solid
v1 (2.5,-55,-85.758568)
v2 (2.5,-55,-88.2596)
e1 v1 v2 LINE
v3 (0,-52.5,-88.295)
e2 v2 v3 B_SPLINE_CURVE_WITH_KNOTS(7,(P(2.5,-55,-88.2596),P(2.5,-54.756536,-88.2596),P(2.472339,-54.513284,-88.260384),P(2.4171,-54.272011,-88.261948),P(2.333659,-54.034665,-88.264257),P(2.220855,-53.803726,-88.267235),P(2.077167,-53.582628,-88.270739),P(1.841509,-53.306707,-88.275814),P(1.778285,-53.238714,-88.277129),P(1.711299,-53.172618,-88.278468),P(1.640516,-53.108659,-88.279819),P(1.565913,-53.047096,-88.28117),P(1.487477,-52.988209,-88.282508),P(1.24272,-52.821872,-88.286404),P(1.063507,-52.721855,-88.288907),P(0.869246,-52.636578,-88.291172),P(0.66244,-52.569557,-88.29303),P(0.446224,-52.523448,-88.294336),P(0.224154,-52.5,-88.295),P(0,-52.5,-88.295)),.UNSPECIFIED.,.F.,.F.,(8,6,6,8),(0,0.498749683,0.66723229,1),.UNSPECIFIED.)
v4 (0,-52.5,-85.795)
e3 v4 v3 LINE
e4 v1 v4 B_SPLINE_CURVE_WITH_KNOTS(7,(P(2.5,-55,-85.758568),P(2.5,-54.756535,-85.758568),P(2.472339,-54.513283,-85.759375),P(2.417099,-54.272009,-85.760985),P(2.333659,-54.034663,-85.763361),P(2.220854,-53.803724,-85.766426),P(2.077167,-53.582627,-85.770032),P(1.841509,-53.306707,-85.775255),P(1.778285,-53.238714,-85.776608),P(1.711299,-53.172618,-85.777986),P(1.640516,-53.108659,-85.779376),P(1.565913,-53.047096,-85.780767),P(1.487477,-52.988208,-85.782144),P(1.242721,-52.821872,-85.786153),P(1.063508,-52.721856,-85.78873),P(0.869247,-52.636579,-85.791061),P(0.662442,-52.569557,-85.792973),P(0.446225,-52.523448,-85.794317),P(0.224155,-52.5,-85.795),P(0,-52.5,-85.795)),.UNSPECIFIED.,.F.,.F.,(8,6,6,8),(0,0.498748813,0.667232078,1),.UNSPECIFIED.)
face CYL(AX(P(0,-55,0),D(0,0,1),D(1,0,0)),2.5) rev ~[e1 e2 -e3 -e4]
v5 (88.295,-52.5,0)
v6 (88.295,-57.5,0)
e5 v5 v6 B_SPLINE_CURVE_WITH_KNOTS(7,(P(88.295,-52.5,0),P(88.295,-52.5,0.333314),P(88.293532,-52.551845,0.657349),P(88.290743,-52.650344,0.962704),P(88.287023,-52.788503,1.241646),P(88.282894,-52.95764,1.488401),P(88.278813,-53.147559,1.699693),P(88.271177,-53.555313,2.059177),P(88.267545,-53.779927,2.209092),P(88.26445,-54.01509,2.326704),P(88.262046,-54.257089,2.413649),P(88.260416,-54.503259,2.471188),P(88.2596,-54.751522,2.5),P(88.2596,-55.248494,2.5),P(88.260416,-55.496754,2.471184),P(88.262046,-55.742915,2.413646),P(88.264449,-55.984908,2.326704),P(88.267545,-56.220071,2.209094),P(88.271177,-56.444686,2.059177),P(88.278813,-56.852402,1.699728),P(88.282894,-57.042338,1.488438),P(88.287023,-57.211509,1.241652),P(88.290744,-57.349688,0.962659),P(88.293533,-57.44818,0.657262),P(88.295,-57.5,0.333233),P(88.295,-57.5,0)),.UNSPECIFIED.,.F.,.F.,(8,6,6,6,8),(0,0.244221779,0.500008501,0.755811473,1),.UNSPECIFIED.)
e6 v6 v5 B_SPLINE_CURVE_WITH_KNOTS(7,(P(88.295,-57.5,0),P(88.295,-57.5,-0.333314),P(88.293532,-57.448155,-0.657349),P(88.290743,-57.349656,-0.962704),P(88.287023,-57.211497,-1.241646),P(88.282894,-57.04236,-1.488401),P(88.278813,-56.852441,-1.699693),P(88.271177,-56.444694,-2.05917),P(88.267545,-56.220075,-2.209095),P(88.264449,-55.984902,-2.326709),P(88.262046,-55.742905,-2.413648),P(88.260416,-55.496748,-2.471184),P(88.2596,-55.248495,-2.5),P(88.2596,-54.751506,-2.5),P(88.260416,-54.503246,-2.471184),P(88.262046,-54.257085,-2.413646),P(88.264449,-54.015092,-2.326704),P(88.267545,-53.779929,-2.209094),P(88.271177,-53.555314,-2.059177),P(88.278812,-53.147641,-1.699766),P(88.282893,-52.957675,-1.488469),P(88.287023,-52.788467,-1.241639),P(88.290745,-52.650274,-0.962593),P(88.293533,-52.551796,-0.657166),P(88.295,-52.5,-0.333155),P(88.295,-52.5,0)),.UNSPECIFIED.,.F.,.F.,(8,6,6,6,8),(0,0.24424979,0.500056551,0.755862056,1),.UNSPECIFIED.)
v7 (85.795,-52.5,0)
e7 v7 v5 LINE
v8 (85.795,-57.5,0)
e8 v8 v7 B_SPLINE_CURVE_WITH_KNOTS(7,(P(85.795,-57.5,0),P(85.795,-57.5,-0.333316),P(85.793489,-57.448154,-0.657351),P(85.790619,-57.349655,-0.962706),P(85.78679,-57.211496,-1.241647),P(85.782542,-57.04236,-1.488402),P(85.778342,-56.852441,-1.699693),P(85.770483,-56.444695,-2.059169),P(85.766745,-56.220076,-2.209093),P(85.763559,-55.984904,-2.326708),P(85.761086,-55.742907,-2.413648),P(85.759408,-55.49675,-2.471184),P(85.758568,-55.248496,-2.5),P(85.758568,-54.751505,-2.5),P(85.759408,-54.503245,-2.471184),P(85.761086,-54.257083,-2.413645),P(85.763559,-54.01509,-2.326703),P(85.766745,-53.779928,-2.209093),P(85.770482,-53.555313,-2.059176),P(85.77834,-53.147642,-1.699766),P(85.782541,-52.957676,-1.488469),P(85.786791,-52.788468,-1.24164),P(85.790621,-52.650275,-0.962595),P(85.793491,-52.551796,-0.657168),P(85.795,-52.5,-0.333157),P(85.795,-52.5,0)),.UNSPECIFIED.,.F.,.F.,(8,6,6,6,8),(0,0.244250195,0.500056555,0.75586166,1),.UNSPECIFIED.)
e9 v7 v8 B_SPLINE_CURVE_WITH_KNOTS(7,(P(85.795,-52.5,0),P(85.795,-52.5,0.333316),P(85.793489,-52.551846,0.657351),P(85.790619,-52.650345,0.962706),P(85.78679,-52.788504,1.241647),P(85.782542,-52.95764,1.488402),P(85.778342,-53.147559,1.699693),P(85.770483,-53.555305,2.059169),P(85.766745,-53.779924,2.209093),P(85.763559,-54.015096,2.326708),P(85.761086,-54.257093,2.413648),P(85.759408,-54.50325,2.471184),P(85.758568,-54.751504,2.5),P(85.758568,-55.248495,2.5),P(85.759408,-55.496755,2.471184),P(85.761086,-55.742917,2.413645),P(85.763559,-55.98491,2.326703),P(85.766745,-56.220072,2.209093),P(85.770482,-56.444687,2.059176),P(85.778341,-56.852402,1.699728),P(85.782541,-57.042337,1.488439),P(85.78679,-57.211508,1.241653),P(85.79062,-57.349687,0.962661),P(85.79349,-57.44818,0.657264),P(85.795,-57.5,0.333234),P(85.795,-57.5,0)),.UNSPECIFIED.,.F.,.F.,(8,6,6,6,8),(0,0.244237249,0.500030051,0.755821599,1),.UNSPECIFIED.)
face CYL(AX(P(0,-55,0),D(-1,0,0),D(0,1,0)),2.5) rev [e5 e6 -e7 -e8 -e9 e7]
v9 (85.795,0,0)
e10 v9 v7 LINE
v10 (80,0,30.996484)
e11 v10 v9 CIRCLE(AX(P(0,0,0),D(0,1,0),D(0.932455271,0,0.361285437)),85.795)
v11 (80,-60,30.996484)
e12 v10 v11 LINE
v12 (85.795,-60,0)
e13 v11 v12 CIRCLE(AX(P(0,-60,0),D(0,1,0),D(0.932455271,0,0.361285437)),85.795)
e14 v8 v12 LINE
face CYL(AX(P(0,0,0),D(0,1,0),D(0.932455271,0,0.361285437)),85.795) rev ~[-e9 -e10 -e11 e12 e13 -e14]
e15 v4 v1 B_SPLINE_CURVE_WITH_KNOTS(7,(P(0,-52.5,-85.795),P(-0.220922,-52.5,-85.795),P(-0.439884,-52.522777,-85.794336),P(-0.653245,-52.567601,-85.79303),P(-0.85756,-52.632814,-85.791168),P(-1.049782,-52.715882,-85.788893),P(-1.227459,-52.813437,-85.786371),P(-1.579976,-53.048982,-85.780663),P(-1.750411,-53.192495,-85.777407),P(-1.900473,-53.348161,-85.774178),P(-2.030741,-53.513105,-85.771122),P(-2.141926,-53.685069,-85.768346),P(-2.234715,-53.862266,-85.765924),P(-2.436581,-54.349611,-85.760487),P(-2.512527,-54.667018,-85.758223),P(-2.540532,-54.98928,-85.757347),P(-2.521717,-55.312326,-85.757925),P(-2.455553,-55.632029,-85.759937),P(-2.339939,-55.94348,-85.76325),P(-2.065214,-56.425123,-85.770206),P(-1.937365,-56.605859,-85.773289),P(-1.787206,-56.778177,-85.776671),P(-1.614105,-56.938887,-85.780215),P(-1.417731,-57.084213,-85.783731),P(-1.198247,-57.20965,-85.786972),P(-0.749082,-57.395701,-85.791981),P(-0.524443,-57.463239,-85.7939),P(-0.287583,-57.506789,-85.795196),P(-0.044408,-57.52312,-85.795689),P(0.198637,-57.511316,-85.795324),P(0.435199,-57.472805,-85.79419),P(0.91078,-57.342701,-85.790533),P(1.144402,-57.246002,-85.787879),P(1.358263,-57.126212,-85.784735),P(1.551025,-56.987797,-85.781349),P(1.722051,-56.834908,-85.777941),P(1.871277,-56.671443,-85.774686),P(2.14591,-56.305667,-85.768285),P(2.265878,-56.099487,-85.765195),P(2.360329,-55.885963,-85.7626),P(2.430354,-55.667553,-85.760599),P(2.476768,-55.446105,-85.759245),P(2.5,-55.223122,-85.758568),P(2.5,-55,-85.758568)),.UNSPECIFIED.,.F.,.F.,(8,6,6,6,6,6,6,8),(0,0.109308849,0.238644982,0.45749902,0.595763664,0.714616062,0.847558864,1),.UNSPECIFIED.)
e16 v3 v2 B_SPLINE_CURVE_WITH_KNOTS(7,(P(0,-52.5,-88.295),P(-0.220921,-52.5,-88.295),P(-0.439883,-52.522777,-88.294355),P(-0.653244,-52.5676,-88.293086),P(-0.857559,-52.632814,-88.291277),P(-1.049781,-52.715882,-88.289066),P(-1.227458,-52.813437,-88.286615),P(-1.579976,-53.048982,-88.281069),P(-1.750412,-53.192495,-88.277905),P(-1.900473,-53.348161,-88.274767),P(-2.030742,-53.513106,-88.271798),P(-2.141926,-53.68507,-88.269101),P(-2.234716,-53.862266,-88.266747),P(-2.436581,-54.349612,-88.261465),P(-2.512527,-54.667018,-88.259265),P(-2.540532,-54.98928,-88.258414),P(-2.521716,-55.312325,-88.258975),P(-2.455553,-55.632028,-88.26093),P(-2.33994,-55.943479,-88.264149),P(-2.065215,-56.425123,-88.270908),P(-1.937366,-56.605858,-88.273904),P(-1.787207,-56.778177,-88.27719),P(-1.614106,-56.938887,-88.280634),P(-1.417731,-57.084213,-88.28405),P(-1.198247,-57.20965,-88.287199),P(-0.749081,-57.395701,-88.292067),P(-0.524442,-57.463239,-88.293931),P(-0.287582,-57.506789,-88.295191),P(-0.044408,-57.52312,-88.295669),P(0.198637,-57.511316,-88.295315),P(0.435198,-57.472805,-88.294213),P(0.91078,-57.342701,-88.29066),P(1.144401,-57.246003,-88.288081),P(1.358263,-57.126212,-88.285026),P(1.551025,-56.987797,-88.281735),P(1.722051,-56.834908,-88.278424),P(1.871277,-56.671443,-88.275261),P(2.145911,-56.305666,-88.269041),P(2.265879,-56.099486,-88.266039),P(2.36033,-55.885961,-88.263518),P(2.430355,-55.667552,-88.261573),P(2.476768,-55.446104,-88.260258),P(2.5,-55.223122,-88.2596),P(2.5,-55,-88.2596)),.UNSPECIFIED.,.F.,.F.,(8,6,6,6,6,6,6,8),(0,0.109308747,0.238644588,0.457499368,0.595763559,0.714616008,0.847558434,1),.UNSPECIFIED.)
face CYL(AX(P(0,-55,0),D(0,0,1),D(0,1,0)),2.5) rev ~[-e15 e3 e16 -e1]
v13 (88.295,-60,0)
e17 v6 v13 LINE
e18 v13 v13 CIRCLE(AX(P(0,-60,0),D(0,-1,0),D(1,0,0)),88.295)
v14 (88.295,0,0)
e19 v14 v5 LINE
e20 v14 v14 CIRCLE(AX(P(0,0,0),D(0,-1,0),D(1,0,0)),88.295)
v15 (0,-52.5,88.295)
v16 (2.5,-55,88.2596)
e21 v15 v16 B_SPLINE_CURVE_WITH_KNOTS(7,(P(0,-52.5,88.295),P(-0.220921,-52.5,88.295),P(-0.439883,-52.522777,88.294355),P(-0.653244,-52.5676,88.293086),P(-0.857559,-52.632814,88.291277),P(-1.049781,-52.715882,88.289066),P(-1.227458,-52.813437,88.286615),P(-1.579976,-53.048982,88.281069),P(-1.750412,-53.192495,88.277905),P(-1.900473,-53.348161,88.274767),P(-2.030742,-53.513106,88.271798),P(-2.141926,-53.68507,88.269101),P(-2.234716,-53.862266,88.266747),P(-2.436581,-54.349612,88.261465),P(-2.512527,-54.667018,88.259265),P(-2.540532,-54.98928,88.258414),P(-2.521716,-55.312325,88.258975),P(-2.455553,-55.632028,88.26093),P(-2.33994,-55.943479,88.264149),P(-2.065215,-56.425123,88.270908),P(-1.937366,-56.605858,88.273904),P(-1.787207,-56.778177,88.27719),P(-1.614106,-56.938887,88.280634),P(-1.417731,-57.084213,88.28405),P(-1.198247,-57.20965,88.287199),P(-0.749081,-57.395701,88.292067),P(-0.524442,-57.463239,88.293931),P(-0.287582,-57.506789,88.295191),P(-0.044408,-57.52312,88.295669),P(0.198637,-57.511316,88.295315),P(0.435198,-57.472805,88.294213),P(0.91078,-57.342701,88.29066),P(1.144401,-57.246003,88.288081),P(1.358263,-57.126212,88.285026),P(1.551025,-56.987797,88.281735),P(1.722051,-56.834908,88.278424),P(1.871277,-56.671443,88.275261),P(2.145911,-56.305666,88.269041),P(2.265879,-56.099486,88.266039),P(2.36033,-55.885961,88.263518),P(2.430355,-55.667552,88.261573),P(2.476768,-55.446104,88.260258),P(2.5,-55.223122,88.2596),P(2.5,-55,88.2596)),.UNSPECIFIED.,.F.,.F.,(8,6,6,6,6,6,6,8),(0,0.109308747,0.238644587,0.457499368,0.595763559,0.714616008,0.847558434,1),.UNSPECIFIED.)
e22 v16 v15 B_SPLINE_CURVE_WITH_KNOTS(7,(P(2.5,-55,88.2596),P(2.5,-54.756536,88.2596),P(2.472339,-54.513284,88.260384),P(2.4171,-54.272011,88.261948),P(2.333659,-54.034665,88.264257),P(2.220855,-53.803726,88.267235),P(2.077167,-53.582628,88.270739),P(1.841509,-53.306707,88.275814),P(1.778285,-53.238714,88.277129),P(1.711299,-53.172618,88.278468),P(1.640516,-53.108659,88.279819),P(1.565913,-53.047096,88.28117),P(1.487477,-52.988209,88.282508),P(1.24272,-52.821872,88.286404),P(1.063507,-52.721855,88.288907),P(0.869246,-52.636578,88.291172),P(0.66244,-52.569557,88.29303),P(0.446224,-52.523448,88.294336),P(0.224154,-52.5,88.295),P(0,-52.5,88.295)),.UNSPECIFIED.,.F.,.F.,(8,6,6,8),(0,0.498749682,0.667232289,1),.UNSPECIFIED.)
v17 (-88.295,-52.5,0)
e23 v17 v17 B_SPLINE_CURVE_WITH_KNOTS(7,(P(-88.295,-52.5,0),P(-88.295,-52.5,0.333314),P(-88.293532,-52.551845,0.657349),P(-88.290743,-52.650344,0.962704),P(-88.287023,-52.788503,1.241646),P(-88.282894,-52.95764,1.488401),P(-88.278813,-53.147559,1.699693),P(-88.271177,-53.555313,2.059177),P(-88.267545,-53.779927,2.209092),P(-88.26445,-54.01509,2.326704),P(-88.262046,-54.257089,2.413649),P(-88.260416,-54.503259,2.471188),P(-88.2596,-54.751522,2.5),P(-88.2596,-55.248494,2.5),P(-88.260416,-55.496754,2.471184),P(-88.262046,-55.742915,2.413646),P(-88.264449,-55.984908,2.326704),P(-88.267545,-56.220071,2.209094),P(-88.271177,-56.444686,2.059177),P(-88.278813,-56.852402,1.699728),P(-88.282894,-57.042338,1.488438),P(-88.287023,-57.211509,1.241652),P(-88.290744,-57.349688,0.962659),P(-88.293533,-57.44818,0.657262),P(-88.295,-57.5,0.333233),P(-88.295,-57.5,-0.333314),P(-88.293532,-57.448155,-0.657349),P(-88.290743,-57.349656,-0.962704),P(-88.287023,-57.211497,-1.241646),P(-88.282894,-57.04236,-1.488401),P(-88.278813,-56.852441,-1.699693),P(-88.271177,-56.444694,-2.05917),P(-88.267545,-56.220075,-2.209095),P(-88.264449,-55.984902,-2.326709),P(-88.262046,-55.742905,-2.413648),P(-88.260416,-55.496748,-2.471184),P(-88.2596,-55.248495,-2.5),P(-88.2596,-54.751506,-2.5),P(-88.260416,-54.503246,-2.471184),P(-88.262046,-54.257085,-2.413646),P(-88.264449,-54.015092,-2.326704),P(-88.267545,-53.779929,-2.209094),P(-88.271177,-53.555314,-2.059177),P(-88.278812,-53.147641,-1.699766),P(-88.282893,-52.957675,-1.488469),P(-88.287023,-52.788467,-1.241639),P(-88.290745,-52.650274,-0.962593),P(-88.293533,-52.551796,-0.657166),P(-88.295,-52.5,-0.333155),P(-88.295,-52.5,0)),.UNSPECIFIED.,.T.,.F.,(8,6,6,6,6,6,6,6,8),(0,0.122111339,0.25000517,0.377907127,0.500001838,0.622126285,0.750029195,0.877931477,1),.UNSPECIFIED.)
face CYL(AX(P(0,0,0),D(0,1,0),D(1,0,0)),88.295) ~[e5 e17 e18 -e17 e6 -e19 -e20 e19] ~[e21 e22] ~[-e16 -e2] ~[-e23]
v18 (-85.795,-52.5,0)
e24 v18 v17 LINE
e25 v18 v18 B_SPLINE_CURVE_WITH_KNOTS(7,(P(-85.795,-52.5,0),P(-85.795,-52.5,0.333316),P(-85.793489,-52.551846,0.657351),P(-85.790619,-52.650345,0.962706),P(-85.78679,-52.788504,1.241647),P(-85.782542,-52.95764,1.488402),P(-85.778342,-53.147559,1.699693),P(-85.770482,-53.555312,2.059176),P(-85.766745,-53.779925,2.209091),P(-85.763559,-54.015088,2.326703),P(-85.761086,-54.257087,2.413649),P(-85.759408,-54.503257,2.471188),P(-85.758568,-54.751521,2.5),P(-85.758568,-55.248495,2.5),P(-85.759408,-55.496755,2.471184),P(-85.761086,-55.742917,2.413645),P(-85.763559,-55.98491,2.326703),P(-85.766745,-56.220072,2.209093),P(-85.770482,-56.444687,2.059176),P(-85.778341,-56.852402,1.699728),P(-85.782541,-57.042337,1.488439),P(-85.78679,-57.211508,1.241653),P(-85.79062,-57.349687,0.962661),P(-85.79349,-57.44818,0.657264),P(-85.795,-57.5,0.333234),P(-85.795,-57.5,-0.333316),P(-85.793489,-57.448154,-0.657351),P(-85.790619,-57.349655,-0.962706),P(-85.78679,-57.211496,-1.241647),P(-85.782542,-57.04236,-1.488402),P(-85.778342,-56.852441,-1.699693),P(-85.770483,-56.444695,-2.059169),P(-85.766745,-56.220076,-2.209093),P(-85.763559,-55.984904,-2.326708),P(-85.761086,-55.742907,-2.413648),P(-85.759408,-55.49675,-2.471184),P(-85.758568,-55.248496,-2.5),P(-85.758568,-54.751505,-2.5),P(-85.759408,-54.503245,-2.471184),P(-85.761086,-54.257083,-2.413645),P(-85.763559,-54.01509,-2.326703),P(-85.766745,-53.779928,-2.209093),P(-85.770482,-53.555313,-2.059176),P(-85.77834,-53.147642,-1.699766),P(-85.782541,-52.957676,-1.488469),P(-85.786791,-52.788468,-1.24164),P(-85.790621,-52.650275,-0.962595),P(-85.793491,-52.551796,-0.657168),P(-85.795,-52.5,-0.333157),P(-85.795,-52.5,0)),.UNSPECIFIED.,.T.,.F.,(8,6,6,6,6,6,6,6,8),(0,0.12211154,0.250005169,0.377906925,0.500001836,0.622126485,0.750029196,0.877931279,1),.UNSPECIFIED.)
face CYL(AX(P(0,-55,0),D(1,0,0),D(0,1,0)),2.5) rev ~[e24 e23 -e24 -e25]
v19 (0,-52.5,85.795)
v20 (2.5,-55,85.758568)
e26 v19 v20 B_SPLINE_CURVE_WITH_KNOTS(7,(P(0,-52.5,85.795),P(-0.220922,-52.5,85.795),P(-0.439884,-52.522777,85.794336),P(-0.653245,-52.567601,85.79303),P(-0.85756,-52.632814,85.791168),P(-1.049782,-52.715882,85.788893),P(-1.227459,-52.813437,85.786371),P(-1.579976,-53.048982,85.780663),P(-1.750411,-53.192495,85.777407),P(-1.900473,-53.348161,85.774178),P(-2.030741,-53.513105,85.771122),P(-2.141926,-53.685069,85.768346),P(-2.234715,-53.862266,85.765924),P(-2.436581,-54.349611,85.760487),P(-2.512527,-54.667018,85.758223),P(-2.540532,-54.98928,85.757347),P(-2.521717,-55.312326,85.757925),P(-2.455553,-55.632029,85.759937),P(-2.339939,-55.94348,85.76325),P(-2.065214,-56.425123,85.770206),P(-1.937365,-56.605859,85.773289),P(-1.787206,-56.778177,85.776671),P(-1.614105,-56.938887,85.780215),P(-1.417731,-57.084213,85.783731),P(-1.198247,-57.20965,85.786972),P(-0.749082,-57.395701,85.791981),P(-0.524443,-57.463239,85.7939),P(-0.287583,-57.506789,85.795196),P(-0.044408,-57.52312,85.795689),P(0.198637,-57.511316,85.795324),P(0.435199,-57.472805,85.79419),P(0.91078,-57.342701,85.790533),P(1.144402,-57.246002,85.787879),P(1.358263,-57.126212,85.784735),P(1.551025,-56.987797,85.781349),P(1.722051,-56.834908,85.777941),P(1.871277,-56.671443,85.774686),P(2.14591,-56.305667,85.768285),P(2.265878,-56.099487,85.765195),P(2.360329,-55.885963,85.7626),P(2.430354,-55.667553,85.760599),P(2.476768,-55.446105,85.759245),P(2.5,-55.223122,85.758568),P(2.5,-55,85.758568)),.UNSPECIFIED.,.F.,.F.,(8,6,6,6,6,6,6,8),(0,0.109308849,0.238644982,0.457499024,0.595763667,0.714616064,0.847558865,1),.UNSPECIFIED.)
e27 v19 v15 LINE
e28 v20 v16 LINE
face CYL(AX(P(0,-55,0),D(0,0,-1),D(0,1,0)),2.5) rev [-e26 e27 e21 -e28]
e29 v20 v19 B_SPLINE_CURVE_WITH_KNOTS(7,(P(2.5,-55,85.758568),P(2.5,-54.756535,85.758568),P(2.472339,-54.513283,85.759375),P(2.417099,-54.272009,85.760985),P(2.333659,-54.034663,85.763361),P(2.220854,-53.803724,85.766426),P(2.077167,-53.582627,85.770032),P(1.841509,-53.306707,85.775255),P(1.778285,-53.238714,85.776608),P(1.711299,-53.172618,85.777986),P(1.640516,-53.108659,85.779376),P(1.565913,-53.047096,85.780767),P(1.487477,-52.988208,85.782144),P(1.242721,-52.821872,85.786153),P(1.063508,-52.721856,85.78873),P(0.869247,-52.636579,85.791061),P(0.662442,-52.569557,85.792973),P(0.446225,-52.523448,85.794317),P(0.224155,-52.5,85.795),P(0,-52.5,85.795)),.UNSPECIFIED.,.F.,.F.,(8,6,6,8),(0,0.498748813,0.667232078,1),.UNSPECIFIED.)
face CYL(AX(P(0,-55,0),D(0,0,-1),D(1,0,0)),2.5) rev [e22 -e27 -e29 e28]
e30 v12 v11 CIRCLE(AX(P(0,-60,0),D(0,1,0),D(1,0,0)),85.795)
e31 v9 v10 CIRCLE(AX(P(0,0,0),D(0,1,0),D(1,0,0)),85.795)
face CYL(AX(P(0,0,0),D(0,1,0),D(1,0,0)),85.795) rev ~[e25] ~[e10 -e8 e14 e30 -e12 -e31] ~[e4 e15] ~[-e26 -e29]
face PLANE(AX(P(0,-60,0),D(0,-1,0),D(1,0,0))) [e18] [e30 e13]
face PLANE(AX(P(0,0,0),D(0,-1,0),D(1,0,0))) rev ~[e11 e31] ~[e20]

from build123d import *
from build123d import SkipClean  # not in build123d's __all__

# Parameters (mm, degrees)
F0_R     = 88.295
F1_DEPTH = 60
F2_R     = 2.5
F3_DEPTH = 300
F4_DEPTH = 300
F6_DEPTH = 300
F7_DEPTH = 300


with BuildPart() as f1:
    # F0 (on Front) → F1 (new body)
    with BuildSketch(Plane.XZ):
        Circle(F0_R)
        with BuildLine():
            ThreePointArc((80, 30.9964840748), (84.3338070557, 15.7667692474), (85.795, 0))
            ThreePointArc((85.795, 0), (-84.3338070557, -15.7667692474), (80, 30.9964840748))
        make_face(mode=Mode.SUBTRACT)
    extrude(amount=F1_DEPTH)

    # F2 (on Right) → F3 (cut)
    with BuildSketch(Plane.YZ):
        with Locations((-55, 0)):
            Circle(F2_R)
    extrude(amount=-F3_DEPTH, mode=Mode.SUBTRACT)

    # F2 (on Right) → F4 (cut)
    with BuildSketch(Plane.YZ):
        with Locations((-55, 0)):
            Circle(F2_R)
    with SkipClean():  # cleaning this boolean's faces spoils the solid; the shape is the same uncleaned
        extrude(amount=F4_DEPTH, mode=Mode.SUBTRACT)

    # F5 (on Top) → F6 (cut)
    with BuildSketch(Plane.XY):
        with BuildLine():
            ThreePointArc((0, -52.5), (-1.767766953, -56.767766953), (2.5, -55))
            ThreePointArc((2.5, -55), (1.767766953, -53.232233047), (0, -52.5))
        make_face()
    with SkipClean():  # cleaning this boolean's faces spoils the solid; the shape is the same uncleaned
        extrude(amount=-F6_DEPTH, mode=Mode.SUBTRACT)

    # F5 (on Top) → F7 (cut)
    with BuildSketch(Plane.XY):
        with BuildLine():
            ThreePointArc((0, -52.5), (-1.767766953, -56.767766953), (2.5, -55))
            ThreePointArc((2.5, -55), (1.767766953, -53.232233047), (0, -52.5))
        make_face()
    with SkipClean():  # cleaning this boolean's faces spoils the solid; the shape is the same uncleaned
        extrude(amount=F7_DEPTH, mode=Mode.SUBTRACT)


solid = f1.part
